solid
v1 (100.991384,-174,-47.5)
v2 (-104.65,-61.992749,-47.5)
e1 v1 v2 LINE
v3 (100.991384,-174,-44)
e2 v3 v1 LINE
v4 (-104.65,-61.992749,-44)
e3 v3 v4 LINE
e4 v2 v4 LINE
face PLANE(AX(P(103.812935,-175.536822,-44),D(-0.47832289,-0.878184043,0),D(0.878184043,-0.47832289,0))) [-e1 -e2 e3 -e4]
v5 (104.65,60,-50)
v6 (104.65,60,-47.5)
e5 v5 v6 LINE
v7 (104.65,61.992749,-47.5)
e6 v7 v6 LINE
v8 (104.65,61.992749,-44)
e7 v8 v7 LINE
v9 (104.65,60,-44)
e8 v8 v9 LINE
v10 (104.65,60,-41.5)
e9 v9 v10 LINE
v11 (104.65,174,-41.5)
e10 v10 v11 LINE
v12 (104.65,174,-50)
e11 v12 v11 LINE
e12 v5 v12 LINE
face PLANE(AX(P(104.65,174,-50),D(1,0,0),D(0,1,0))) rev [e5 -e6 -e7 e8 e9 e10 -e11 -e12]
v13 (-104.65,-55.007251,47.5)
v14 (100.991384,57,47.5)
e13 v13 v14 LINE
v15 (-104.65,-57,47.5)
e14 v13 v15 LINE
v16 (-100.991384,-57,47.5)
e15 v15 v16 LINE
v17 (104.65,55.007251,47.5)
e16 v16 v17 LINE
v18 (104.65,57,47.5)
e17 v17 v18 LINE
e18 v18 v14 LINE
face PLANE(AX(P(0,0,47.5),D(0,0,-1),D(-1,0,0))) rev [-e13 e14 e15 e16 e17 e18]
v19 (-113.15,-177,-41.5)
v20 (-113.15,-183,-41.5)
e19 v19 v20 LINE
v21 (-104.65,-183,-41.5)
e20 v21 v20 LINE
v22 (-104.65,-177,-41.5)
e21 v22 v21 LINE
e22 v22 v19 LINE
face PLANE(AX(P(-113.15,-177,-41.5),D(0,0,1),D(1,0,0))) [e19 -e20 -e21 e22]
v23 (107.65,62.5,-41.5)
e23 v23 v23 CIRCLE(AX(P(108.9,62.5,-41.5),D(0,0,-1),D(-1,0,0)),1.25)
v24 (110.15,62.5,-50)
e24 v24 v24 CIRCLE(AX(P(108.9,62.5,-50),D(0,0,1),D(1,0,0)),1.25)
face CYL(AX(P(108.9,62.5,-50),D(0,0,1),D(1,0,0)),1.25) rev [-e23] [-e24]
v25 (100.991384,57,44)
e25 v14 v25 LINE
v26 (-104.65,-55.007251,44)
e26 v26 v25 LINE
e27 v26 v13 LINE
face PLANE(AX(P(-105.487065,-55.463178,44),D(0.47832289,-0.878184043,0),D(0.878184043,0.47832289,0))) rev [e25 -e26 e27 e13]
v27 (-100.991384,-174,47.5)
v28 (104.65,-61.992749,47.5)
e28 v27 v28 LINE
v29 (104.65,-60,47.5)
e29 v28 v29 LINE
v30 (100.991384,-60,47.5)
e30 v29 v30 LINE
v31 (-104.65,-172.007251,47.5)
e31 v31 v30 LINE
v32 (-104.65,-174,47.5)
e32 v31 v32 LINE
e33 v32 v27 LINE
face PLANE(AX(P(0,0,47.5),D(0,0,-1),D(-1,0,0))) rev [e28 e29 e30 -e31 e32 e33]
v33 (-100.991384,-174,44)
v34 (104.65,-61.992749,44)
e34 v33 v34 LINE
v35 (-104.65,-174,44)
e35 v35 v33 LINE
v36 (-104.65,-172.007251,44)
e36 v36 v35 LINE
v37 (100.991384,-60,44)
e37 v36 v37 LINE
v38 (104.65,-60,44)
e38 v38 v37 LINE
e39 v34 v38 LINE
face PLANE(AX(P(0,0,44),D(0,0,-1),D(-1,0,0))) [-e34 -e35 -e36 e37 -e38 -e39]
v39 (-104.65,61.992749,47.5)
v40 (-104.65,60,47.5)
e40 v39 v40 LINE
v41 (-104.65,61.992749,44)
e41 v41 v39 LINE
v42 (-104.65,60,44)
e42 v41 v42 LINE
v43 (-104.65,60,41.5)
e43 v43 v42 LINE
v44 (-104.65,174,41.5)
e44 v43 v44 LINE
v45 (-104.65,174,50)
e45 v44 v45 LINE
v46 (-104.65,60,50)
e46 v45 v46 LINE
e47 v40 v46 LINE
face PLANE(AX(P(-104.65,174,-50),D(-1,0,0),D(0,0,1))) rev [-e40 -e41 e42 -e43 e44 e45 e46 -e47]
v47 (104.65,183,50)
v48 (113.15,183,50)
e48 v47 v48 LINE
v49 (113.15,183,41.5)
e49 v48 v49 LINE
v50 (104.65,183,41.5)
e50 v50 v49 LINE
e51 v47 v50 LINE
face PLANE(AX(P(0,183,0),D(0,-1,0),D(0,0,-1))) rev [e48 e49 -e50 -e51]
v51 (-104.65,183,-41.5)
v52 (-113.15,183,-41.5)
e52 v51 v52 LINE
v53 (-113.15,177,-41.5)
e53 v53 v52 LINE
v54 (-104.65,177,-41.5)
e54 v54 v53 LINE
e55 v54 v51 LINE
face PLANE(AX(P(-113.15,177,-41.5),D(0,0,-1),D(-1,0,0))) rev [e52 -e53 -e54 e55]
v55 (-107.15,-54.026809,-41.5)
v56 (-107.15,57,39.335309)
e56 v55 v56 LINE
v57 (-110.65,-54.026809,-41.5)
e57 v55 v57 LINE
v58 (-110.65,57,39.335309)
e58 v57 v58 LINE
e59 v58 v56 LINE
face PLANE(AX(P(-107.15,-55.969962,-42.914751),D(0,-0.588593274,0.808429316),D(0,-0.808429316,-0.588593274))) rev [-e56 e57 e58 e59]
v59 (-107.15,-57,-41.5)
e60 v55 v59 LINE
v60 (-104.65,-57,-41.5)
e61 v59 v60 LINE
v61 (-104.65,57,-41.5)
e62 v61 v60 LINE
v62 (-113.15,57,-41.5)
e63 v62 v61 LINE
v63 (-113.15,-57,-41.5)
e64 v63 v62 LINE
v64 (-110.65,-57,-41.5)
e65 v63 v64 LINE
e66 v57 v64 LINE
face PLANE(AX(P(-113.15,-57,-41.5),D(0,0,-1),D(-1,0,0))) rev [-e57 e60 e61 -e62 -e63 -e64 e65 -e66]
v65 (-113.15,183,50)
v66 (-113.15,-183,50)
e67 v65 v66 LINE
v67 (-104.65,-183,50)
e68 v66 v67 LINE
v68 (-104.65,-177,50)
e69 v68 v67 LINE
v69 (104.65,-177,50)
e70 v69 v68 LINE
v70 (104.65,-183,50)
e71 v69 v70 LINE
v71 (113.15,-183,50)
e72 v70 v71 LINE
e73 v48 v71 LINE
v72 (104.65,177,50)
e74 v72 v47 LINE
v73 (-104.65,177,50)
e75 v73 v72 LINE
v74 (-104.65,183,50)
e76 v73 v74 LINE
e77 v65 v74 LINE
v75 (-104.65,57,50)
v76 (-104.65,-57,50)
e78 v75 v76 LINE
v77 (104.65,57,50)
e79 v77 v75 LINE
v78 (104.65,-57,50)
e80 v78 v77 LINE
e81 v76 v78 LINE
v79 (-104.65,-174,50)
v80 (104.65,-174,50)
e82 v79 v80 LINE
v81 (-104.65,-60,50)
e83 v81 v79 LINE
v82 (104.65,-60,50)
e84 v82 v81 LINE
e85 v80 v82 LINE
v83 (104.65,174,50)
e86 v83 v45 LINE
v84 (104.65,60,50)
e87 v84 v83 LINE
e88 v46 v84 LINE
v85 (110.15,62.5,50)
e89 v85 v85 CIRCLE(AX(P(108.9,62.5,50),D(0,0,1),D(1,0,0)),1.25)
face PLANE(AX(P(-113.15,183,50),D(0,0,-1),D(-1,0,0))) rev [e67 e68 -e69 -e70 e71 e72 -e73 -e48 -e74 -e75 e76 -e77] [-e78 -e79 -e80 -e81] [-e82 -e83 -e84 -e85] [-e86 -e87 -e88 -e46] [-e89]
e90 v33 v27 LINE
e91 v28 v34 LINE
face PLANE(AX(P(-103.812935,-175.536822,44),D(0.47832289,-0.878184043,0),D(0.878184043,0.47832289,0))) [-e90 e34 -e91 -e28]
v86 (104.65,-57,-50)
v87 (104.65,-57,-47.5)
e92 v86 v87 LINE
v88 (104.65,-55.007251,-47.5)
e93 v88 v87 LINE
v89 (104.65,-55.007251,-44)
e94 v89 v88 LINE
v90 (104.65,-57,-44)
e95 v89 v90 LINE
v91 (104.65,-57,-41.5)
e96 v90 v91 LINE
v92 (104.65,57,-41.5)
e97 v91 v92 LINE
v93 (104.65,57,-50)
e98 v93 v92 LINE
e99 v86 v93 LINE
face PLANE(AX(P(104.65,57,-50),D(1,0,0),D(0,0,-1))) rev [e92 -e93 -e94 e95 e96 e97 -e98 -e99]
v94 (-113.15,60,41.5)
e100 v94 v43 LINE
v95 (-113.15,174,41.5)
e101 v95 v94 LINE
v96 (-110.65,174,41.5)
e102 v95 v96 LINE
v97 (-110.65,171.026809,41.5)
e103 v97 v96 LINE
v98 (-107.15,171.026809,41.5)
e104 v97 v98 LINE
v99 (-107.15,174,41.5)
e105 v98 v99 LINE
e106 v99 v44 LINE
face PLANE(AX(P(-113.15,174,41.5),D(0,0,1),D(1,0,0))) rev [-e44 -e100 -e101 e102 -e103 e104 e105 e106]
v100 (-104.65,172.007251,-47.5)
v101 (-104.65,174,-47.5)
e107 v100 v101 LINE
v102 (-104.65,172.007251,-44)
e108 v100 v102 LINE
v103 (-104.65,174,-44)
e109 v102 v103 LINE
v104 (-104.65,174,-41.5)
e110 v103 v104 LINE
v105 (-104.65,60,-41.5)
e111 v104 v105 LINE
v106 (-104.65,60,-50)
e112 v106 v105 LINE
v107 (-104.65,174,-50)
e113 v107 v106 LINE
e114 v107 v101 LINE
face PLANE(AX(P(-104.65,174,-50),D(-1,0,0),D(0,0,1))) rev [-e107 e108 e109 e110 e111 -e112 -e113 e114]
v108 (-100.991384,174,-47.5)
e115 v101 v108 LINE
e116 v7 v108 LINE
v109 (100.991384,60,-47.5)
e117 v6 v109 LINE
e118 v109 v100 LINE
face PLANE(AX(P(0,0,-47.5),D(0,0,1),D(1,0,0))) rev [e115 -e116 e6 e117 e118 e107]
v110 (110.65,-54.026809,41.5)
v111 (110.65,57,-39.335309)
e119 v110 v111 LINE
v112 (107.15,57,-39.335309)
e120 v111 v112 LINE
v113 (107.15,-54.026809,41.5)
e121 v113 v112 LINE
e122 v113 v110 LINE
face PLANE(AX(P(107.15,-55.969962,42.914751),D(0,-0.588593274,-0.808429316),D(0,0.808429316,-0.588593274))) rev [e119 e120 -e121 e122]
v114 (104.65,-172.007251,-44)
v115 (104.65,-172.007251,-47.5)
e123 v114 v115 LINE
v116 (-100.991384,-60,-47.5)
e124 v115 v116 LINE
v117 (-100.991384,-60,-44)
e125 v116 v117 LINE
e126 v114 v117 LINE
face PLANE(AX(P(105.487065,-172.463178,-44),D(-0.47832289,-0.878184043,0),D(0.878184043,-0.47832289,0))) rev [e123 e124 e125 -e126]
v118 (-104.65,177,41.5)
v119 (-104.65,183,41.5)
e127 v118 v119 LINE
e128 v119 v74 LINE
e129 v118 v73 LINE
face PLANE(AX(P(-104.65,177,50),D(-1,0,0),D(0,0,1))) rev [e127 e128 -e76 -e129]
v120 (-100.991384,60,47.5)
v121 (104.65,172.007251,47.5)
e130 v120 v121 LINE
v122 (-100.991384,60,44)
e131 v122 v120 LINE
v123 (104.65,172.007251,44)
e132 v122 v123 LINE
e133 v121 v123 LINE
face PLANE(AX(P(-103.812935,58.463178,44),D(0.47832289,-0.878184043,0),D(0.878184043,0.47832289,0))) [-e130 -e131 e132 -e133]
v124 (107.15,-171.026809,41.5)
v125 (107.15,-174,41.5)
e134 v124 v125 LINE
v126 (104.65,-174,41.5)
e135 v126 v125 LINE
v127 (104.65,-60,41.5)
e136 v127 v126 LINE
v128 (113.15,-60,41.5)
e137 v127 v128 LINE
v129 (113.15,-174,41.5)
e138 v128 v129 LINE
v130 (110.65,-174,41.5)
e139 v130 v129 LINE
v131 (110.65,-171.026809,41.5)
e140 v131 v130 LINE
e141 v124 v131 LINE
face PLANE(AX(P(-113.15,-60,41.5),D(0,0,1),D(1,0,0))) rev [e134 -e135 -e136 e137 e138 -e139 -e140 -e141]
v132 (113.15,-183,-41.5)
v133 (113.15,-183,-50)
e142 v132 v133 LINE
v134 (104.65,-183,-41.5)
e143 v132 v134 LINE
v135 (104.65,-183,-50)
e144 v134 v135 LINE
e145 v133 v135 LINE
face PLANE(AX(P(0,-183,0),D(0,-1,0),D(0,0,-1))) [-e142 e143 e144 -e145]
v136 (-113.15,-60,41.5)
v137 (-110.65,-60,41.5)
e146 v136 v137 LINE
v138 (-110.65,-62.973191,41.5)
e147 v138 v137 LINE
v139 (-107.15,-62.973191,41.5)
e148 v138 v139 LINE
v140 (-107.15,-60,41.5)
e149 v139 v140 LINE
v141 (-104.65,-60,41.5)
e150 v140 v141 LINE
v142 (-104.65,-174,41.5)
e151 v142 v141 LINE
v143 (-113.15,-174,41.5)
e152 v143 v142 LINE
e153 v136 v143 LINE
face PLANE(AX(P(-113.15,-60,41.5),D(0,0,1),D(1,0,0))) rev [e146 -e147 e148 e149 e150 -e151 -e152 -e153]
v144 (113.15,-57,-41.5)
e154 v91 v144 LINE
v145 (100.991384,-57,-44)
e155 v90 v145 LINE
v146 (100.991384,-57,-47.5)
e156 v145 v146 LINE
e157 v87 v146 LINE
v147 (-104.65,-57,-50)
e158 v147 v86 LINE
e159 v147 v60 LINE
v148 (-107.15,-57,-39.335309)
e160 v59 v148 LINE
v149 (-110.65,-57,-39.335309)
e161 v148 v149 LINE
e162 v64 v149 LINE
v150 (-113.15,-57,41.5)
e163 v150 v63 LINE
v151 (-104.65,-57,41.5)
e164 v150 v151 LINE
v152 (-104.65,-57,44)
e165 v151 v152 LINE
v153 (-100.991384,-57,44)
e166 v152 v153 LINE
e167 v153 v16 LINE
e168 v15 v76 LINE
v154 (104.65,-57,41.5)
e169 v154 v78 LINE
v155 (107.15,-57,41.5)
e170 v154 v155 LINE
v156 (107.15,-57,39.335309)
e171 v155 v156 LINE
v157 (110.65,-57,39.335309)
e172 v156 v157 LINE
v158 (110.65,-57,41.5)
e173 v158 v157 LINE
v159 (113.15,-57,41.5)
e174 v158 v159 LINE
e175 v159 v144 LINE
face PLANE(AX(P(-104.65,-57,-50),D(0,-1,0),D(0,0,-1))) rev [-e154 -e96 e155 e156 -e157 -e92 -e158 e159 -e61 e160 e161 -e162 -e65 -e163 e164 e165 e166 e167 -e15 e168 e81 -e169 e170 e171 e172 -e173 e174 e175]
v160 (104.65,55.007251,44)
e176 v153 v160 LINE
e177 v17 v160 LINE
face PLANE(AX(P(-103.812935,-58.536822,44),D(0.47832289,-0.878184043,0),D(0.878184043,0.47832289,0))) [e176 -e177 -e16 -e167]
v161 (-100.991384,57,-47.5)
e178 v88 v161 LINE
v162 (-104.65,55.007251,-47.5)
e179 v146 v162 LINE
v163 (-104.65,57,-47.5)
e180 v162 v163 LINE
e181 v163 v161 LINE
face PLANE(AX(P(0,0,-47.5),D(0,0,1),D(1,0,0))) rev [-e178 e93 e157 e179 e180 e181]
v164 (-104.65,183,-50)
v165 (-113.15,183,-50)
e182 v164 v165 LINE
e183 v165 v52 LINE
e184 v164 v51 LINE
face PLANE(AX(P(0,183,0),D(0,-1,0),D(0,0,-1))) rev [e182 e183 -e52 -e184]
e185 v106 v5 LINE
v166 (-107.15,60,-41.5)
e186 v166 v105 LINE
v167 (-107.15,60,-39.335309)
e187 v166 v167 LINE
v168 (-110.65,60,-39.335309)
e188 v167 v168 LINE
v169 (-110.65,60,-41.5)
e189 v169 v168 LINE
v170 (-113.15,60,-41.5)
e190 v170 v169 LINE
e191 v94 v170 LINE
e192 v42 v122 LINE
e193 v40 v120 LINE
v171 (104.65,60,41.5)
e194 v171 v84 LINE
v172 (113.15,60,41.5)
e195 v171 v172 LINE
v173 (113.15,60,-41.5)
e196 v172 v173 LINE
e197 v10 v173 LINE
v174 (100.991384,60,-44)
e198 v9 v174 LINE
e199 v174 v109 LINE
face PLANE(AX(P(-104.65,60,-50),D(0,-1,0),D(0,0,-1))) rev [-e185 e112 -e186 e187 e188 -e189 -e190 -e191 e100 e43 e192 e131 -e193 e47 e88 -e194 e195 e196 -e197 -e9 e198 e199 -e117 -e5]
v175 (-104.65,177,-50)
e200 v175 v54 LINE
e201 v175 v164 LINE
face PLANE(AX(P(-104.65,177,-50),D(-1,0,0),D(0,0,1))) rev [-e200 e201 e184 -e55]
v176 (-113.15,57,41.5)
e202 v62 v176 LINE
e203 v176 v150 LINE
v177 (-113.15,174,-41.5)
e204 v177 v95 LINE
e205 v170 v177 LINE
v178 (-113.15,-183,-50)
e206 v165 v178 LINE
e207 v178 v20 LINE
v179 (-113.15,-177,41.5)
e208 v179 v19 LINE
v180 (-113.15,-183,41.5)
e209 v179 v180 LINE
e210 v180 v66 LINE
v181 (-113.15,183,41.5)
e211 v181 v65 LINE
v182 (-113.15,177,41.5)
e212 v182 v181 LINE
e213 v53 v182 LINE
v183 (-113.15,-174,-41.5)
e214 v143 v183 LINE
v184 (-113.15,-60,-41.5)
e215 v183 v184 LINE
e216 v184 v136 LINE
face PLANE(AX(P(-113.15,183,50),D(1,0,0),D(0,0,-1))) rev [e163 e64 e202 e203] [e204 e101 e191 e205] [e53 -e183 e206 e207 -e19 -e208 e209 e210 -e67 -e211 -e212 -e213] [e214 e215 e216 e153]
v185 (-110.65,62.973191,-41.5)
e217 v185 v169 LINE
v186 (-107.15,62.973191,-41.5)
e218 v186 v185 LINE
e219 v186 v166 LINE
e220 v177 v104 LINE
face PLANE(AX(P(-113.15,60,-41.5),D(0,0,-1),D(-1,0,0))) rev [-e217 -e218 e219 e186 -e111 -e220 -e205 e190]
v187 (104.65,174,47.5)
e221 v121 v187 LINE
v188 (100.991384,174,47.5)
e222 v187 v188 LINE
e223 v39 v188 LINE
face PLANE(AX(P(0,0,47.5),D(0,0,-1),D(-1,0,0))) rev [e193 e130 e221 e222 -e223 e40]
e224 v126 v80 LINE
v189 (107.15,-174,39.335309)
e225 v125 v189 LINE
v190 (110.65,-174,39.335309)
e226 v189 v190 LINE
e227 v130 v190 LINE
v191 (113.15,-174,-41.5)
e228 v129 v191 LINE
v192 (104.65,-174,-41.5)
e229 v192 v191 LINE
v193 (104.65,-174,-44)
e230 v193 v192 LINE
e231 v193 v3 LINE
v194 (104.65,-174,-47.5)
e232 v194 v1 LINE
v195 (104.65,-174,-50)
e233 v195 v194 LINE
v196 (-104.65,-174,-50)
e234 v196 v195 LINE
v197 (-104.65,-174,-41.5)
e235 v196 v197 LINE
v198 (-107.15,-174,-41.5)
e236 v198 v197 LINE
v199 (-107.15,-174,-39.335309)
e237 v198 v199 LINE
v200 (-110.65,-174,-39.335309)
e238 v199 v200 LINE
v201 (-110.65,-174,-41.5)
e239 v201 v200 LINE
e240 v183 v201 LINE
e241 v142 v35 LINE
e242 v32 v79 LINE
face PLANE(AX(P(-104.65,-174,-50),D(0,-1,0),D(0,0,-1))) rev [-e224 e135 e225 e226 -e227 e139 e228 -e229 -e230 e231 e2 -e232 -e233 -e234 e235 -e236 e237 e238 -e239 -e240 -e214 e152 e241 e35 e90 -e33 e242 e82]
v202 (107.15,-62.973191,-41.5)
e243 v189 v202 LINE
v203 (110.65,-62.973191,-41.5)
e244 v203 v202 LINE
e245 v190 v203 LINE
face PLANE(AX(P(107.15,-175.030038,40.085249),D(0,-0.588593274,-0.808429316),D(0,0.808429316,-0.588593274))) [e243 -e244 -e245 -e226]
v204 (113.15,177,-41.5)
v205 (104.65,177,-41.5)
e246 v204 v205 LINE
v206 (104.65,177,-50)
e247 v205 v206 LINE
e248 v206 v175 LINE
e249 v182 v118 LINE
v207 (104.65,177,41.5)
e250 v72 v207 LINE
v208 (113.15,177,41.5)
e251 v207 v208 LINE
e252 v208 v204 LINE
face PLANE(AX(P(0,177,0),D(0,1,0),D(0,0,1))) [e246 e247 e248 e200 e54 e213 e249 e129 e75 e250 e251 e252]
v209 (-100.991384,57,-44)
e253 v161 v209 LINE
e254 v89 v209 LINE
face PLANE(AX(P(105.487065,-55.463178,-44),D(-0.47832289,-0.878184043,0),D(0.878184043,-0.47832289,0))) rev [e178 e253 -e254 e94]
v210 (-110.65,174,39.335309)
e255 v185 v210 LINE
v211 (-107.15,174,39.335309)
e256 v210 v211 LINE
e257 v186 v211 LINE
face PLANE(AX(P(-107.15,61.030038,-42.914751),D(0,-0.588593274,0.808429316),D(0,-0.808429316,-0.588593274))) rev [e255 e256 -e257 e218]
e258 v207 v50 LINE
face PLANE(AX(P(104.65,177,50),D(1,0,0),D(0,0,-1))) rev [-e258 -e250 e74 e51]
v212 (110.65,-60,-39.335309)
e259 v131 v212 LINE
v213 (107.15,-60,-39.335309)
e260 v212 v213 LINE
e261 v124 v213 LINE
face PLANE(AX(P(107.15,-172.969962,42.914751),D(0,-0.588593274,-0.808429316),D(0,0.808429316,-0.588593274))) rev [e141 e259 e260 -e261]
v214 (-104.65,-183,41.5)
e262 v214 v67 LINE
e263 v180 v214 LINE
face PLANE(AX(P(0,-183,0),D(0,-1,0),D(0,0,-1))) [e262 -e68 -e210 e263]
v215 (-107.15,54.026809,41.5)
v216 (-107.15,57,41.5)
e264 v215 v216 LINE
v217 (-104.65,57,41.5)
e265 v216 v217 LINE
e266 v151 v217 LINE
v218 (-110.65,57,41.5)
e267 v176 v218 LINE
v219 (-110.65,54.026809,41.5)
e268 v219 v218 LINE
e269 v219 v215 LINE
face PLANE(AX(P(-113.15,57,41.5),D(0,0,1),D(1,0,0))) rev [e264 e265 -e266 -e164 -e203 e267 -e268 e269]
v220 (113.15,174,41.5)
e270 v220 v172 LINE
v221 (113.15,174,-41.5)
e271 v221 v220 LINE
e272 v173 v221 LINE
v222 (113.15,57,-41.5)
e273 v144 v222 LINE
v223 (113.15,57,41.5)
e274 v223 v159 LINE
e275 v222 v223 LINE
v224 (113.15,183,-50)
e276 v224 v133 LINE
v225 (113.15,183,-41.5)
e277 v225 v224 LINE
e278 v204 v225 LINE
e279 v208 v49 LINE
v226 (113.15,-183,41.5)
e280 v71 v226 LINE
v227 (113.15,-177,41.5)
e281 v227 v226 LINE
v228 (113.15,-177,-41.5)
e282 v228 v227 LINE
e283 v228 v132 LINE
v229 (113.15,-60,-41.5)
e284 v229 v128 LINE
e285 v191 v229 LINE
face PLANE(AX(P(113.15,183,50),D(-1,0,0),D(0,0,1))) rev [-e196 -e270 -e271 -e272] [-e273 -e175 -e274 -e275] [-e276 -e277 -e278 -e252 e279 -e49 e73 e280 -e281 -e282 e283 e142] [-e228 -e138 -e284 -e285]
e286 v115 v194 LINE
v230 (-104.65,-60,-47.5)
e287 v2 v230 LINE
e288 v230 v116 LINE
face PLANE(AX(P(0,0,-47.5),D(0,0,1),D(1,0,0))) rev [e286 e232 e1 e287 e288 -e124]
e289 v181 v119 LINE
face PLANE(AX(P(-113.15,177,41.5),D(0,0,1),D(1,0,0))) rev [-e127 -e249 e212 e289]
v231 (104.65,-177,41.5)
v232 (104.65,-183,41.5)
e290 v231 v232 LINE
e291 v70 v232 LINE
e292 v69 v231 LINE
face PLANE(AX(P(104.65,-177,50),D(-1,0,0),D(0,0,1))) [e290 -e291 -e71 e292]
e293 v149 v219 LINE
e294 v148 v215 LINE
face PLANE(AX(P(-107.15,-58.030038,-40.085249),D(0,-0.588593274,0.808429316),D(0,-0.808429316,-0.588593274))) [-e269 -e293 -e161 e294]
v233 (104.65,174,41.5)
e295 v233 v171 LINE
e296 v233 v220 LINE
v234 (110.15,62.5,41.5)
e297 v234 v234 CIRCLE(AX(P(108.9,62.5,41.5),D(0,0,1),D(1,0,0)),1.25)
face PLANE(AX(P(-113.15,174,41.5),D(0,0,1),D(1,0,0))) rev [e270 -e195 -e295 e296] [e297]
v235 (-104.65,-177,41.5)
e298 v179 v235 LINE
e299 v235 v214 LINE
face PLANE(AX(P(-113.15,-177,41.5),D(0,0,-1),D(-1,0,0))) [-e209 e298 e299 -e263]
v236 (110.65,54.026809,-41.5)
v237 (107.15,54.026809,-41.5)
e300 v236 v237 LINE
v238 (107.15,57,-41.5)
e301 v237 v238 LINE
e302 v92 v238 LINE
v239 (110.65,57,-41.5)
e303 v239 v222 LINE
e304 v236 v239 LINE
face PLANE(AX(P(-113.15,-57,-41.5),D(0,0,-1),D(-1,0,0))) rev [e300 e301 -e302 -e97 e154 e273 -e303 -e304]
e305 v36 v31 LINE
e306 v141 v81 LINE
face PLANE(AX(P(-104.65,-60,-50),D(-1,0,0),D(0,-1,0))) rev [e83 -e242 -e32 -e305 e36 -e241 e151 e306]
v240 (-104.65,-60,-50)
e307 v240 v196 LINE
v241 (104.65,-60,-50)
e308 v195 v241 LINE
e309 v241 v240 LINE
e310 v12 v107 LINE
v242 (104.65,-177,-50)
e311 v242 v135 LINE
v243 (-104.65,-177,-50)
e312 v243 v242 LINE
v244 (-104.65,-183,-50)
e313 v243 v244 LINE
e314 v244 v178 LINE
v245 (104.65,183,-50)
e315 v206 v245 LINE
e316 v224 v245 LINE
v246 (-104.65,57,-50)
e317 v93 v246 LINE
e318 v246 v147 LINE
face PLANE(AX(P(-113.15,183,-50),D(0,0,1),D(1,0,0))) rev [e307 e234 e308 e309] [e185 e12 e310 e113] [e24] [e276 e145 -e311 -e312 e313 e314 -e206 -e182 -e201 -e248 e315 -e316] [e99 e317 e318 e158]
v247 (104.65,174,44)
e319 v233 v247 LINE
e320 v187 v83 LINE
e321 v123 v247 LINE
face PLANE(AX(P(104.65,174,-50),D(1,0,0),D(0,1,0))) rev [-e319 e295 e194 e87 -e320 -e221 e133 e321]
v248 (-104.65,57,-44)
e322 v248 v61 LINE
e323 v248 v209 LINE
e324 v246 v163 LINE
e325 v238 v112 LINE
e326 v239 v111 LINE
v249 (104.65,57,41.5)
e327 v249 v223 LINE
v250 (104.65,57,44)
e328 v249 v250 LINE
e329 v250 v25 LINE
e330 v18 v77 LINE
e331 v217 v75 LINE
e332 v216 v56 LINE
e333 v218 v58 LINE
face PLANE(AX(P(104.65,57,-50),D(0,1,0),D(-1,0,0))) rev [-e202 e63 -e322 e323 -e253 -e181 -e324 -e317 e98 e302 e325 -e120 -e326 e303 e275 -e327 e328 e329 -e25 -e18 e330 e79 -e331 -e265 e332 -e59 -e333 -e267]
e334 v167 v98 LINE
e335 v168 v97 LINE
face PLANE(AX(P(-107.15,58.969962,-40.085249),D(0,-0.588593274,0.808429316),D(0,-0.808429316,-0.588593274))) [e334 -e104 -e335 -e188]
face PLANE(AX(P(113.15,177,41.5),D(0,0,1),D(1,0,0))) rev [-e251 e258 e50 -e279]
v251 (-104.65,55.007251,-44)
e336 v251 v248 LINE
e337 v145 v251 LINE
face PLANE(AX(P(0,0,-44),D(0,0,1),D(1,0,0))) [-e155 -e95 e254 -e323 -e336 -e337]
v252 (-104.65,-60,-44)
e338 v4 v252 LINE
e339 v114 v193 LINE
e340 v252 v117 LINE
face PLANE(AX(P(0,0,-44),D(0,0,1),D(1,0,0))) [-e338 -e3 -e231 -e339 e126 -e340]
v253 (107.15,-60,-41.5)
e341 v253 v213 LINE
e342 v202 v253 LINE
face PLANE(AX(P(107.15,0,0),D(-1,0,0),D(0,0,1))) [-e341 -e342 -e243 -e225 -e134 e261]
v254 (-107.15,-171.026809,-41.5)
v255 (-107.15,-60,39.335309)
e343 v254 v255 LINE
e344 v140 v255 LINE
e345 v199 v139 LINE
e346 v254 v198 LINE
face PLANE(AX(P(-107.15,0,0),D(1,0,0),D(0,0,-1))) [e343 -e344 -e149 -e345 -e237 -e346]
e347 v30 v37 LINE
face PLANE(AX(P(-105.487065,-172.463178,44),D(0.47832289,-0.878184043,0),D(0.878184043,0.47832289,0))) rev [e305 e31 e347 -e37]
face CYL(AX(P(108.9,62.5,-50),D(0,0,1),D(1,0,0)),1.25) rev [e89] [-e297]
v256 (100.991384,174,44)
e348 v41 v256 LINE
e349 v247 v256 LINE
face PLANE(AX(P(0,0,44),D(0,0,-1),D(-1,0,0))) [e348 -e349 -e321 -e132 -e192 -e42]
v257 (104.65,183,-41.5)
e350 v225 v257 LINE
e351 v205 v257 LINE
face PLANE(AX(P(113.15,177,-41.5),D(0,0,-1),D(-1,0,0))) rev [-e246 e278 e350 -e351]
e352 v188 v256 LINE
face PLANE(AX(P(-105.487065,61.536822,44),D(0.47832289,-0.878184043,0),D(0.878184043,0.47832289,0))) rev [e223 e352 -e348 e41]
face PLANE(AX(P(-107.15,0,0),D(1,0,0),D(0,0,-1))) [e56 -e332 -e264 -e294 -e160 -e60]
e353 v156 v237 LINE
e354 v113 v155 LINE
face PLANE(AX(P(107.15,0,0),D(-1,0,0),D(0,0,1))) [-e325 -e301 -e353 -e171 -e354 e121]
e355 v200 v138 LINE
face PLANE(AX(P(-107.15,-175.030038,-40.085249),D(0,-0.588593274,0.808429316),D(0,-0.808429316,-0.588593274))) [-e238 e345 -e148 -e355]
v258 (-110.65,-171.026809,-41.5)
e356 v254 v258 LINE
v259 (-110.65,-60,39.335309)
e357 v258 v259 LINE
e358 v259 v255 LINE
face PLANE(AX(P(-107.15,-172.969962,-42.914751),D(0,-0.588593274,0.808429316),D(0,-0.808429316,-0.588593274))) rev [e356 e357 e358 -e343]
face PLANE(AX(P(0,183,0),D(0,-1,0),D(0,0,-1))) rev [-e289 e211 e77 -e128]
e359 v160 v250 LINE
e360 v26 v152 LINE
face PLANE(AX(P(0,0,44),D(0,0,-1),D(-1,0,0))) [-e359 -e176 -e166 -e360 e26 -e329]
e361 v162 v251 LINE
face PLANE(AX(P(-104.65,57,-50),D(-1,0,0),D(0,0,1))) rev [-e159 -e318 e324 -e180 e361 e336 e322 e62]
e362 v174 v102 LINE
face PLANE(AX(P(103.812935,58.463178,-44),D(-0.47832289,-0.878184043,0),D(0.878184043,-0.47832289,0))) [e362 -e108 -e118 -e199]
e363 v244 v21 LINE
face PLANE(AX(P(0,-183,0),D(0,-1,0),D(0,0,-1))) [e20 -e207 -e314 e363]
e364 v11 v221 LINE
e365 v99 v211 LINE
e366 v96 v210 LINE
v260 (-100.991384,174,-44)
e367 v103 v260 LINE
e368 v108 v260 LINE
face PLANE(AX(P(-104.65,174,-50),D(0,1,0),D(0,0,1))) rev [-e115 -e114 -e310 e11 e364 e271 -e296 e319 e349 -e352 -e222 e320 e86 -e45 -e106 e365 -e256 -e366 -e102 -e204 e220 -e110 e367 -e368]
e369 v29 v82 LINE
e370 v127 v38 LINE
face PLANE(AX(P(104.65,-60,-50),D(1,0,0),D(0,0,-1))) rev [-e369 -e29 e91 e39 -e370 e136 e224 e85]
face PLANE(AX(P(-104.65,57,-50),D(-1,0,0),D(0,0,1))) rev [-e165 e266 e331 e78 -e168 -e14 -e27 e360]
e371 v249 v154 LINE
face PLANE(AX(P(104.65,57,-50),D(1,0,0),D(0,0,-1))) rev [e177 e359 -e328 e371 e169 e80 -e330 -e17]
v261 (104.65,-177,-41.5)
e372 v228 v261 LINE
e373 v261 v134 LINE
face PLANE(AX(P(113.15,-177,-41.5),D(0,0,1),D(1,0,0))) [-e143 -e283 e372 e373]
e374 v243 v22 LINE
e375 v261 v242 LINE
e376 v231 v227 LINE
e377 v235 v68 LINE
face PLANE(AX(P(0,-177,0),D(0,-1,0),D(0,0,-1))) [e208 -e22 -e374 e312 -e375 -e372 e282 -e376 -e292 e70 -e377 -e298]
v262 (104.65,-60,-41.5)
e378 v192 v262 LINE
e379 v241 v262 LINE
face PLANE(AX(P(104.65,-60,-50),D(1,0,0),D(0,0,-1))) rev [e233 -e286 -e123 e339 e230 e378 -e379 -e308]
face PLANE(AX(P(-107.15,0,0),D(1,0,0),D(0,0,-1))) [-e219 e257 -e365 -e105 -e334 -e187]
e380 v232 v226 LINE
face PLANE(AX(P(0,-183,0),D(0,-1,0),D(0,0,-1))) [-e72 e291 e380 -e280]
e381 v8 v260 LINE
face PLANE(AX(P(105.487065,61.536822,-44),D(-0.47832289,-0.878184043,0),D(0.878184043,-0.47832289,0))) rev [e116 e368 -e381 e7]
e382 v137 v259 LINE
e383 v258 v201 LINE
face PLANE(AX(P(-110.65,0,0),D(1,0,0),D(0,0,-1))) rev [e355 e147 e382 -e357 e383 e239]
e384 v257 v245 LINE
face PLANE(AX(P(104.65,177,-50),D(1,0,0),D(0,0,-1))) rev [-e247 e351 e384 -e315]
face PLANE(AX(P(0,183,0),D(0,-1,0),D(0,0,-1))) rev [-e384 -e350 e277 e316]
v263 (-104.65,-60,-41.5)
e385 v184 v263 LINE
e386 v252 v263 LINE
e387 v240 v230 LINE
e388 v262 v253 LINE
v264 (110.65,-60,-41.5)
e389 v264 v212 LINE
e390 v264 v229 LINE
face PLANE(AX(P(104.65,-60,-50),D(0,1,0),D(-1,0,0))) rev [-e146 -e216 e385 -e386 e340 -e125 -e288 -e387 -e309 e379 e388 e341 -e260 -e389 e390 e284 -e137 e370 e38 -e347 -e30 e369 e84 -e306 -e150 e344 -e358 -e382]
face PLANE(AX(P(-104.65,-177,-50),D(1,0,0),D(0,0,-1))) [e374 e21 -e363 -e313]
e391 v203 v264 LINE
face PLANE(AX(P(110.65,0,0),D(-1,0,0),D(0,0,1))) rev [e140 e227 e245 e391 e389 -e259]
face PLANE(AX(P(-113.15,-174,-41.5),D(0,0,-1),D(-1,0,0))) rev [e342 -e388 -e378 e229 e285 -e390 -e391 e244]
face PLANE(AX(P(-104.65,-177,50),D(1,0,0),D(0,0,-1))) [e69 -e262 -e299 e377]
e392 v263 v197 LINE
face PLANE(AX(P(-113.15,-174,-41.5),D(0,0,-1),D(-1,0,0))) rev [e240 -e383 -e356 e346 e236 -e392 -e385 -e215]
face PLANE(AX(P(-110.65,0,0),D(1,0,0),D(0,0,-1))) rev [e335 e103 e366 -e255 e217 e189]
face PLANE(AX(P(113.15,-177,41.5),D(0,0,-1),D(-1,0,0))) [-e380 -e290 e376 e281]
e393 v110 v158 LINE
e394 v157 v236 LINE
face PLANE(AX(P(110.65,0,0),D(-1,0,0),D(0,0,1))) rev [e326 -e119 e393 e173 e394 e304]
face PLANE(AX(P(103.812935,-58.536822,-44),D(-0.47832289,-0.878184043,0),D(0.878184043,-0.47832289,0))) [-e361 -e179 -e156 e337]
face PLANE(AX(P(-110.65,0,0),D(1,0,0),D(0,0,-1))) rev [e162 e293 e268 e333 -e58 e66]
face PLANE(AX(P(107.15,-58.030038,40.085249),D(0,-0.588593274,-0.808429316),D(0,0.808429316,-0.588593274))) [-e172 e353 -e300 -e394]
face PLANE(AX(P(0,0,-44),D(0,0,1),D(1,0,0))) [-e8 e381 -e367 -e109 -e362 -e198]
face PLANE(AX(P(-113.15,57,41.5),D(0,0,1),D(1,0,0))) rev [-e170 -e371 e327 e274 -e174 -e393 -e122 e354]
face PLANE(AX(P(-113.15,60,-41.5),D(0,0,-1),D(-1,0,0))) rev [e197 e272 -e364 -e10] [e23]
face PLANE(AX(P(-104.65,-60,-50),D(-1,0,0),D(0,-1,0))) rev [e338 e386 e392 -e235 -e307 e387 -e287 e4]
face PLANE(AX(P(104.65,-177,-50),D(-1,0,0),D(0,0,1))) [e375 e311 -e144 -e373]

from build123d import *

# Parameters (mm, degrees)
SKETCH2_W               = 226.3
SKETCH2_H               = 100
BOSS_EXTRUDE1_DEPTH     = 183
SKETCH4_OUTSIDE_W       = 316.656
SKETCH4_OUTSIDE_H       = 190.356
SKETCH4_OUTSIDE_W_2     = 8.5
SKETCH4_OUTSIDE_H_2     = 8.5
CUT_EXTRUDE1_DEPTH      = 6
SKETCH5_W               = 209.3
SKETCH5_H               = 114
CUT_EXTRUDE2_DEPTH      = 238.259188442
SKETCH6_W               = 83
SKETCH6_H               = 114
CUT_EXTRUDE3_DEPTH      = 296.29762952
EXTRUDE_THIN1_START     = -2.5
EXTRUDE_THIN1_DEPTH     = 3.5
EXTRUDE_THIN2_START     = -2.5
EXTRUDE_THIN2_DEPTH     = 3.5
CIRPATTERN1_COUNT       = 2
DELETEFACE2_START       = 107.15
DELETEFACE2_DEPTH       = 3.5
CUT_EXTRUDE4_DEPTH      = 221.888937025
CUT_EXTRUDE4_DEPTH_BACK = 221.888937025
SKETCH9_R               = 1.25


# Read off the part's stored shape, not the designer's step: DeleteFace2
with BuildPart() as part:
    # Sketch2 → Boss-Extrude1 (new, symmetric)
    with BuildSketch(Plane(origin=(0, 0, 0), x_dir=(1, 0, 0), z_dir=(0, 1, 0))):
        Rectangle(SKETCH2_W, SKETCH2_H)
    extrude(amount=BOSS_EXTRUDE1_DEPTH, both=True)

    # Sketch4 outside → Cut-Extrude1 (cut)
    with BuildSketch(Plane.XZ.offset(183)):
        Rectangle(SKETCH4_OUTSIDE_W, SKETCH4_OUTSIDE_H)
        with Locations((-108.9, 45.75)):
            Rectangle(SKETCH4_OUTSIDE_W_2, SKETCH4_OUTSIDE_H_2, mode=Mode.SUBTRACT)
        with Locations((-108.9, -45.75)):
            Rectangle(SKETCH4_OUTSIDE_W_2, SKETCH4_OUTSIDE_H_2, mode=Mode.SUBTRACT)
        with Locations((108.9, -45.75)):
            Rectangle(SKETCH4_OUTSIDE_W_2, SKETCH4_OUTSIDE_H_2, mode=Mode.SUBTRACT)
        with Locations((108.9, 45.75)):
            Rectangle(SKETCH4_OUTSIDE_W_2, SKETCH4_OUTSIDE_H_2, mode=Mode.SUBTRACT)
    cut_extrude1 = extrude(amount=-CUT_EXTRUDE1_DEPTH, mode=Mode.SUBTRACT)

    # Mirror1: Cut-Extrude1 across plane
    add(cut_extrude1.mirror(Plane.ZX), mode=Mode.SUBTRACT)

    # Sketch5 → Cut-Extrude2 (cut, through all)
    with BuildSketch(Plane.XY.offset(50)):
        with Locations((0, 117)):
            Rectangle(SKETCH5_W, SKETCH5_H)
        with Locations((0, -117)):
            Rectangle(SKETCH5_W, SKETCH5_H)
        Rectangle(SKETCH5_W, SKETCH5_H)
    extrude(amount=-CUT_EXTRUDE2_DEPTH, mode=Mode.SUBTRACT)

    # Sketch6 → Cut-Extrude3 (cut, through all)
    with BuildSketch(Plane(origin=(113.15, 0, 0), x_dir=(0, 0, -1), z_dir=(1, 0, 0))):
        with Locations((0, 117)):
            Rectangle(SKETCH6_W, SKETCH6_H)
        with Locations((0, -117)):
            Rectangle(SKETCH6_W, SKETCH6_H)
        Rectangle(SKETCH6_W, SKETCH6_H)
    extrude(amount=-CUT_EXTRUDE3_DEPTH, mode=Mode.SUBTRACT)

    # Sketch7 → Extrude-Thin1 (add)
    with BuildSketch(Plane.XY.offset(50).offset(EXTRUDE_THIN1_START)):
        Polygon((-103.812934943, -175.536822075), (105.487065057, -61.536822075), (103.812934943, -58.463177925), (-105.487065057, -172.463177925), align=None)
        Polygon((-103.812934943, -58.536822075), (105.487065057, 55.463177925), (103.812934943, 58.536822075), (-105.487065057, -55.463177925), align=None)
        Polygon((-103.812934943, 58.463177925), (105.487065057, 172.463177925), (103.812934943, 175.536822075), (-105.487065057, 61.536822075), align=None)
    extrude_thin1 = extrude(amount=-EXTRUDE_THIN1_DEPTH)

    # Sketch8 → Extrude-Thin2 (add)
    with BuildSketch(Plane(origin=(113.15, 0, 0), x_dir=(0, 0, -1), z_dir=(1, 0, 0)).offset(EXTRUDE_THIN2_START)):
        Polygon((-40.085248698, -175.030038229), (42.914751302, -61.030038229), (40.085248698, -58.969961771), (-42.914751302, -172.969961771), align=None)
        Polygon((-40.085248698, -58.030038229), (42.914751302, 55.969961771), (40.085248698, 58.030038229), (-42.914751302, -55.969961771), align=None)
        Polygon((-40.085248698, 58.969961771), (42.914751302, 172.969961771), (40.085248698, 175.030038229), (-42.914751302, 61.030038229), align=None)
    extrude_thin2 = extrude(amount=-EXTRUDE_THIN2_DEPTH)

    # CirPattern1: Extrude-Thin1, Extrude-Thin2 ×2 about axis
    cirpattern1_axis = Axis((0, 0, 0), (0, 1, 0))
    add([extrude_thin1.rotate(cirpattern1_axis, i * 360 / CIRPATTERN1_COUNT) for i in range(1, CIRPATTERN1_COUNT)])
    add([extrude_thin2.rotate(cirpattern1_axis, i * 360 / CIRPATTERN1_COUNT) for i in range(1, CIRPATTERN1_COUNT)])

    # DeleteFace2 outline → DeleteFace2 (cut)
    with BuildSketch(Plane.YZ.offset(DELETEFACE2_START)):
        Polygon((60, 41.5), (60, 39.335308584), (171.02680938, -41.5), (174, -41.5), (174, -39.335308584), (62.97319062, 41.5), align=None)
    extrude(amount=DELETEFACE2_DEPTH, mode=Mode.SUBTRACT)

    # Sketch9 → Cut-Extrude4 (cut, two sides: drawn at the far end of the back side and taken through both)
    with BuildSketch(Plane.XY.offset(-CUT_EXTRUDE4_DEPTH_BACK)):
        with Locations((108.9, 62.5)):
            Circle(SKETCH9_R)
    extrude(amount=CUT_EXTRUDE4_DEPTH + CUT_EXTRUDE4_DEPTH_BACK, mode=Mode.SUBTRACT)


solid = part.part
